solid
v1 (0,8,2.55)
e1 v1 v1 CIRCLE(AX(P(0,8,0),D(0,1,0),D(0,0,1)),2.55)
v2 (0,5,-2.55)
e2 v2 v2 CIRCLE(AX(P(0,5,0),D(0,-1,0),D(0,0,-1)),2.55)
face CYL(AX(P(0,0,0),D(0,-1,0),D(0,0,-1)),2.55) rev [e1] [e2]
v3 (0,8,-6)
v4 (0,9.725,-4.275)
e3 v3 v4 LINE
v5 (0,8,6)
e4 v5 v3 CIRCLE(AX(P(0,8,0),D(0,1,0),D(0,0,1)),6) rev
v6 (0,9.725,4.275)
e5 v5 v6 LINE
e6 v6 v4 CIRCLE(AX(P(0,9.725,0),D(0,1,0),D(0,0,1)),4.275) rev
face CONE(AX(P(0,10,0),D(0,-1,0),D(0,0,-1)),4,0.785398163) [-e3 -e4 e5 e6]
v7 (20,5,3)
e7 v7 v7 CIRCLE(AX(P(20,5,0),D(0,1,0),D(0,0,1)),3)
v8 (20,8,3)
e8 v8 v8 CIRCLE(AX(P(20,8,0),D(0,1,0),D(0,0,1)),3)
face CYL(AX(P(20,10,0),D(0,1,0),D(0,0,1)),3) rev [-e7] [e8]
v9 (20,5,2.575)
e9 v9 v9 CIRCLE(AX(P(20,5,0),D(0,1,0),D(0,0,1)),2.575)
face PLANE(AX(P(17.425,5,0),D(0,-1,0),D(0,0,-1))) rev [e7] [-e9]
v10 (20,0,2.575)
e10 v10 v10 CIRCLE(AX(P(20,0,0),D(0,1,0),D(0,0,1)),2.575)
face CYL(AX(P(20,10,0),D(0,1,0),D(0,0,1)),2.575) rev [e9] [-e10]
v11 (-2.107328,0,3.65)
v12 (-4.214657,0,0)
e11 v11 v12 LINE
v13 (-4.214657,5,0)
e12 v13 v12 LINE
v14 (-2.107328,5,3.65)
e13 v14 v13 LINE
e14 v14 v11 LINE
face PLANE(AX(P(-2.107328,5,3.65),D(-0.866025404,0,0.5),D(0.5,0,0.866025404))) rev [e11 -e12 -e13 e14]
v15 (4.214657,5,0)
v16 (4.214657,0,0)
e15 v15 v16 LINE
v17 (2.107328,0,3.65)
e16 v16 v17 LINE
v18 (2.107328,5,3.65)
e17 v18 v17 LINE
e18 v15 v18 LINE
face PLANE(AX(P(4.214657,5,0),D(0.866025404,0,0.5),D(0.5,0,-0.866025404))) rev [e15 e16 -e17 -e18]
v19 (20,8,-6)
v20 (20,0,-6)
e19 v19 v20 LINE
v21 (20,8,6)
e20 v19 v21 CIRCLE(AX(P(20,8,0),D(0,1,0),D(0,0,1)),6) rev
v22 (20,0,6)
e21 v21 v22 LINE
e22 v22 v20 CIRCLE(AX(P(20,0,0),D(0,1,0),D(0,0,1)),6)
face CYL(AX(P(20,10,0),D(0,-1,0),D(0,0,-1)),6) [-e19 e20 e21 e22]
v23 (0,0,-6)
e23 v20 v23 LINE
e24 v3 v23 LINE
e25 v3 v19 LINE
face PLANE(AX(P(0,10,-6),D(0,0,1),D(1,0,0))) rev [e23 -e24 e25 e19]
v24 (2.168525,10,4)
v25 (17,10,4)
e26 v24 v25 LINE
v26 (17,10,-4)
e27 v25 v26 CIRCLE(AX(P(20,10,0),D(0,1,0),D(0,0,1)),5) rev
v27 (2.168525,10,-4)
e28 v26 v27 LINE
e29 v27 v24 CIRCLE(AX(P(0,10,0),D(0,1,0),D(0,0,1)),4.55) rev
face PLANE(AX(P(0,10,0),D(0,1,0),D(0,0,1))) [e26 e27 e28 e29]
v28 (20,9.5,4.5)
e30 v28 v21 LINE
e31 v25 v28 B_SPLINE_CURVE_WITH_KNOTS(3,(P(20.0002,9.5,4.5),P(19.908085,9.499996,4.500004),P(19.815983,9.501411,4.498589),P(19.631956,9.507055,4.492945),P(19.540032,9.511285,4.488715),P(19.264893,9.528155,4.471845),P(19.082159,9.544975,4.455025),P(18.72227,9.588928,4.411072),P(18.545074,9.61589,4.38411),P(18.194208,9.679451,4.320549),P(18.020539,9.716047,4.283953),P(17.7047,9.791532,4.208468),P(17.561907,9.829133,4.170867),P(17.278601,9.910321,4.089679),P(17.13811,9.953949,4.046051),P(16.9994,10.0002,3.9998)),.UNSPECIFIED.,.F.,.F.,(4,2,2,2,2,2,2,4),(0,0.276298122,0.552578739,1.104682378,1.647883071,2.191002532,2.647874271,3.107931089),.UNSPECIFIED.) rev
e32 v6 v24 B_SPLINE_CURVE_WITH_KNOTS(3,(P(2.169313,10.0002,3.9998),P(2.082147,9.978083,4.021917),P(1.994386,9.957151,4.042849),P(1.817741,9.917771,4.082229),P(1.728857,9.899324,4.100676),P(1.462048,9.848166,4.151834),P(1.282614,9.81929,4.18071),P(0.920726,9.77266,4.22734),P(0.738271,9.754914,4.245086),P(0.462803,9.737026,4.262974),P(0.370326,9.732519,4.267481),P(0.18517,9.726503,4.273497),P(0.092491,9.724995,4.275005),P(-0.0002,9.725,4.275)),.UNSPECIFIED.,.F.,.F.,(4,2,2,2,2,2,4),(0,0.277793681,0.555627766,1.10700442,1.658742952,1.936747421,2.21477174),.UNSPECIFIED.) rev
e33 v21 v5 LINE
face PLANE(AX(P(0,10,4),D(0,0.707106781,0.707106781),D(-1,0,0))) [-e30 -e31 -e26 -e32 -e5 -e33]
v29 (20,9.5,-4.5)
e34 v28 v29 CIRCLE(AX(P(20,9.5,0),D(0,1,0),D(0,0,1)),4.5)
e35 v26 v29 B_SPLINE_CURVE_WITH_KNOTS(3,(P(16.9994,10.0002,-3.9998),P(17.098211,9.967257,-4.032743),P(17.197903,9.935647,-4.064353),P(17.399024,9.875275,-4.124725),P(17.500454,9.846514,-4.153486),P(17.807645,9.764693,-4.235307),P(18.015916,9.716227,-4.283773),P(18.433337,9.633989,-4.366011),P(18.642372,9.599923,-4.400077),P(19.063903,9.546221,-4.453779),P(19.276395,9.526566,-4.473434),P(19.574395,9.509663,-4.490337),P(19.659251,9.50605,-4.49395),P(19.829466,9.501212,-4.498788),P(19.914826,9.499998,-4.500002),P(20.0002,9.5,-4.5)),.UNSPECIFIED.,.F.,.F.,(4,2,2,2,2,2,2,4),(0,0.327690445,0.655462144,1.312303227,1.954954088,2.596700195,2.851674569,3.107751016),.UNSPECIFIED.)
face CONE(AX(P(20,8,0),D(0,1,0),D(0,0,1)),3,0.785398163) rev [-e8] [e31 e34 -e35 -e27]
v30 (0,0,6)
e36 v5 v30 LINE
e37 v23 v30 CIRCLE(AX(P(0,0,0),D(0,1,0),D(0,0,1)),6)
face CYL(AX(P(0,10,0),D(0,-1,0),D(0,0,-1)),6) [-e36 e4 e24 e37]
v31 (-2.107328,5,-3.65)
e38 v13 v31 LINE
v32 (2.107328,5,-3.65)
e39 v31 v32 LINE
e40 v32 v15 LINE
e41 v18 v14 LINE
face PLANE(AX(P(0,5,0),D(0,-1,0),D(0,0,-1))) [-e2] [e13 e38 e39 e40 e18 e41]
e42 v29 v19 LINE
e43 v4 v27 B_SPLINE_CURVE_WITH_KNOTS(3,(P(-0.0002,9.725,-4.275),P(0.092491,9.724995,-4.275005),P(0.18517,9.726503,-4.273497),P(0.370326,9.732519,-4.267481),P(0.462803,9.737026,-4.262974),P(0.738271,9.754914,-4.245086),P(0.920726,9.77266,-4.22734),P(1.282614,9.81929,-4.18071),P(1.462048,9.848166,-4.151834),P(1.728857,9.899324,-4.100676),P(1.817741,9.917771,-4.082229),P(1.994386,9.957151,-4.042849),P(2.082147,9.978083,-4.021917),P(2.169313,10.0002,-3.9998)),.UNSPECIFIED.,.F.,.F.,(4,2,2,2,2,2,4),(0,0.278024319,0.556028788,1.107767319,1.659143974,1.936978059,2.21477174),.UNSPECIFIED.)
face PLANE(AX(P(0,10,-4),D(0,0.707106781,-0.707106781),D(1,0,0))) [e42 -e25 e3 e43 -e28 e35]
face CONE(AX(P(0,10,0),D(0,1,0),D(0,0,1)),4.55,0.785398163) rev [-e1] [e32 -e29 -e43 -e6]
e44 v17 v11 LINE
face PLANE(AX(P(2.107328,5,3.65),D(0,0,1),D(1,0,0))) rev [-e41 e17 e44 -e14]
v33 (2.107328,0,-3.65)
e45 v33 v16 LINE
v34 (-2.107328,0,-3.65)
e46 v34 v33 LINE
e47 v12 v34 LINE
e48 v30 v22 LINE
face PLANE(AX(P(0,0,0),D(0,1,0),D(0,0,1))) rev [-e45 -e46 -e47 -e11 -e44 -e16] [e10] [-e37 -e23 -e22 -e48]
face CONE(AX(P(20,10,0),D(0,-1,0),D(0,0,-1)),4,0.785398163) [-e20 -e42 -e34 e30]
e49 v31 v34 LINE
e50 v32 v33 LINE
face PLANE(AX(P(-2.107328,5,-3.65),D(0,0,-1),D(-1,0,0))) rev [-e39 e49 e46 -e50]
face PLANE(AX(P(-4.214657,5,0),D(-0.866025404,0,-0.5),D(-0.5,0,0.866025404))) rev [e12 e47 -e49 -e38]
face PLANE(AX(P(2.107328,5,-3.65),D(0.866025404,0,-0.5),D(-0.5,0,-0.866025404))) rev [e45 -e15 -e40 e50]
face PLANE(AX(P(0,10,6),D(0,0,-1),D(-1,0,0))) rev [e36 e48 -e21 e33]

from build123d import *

# Parameters (mm, degrees)
EXTRUDE_1_DEPTH     = 10
CHAMFER_1_SIZE      = 2
CUT_EXTRUDE_1_DEPTH = 5


with BuildPart() as part:
    # 草图1 → 凸台-拉伸1 (new body)
    with BuildSketch(Plane(origin=(0, 0, 0), x_dir=(1, 0, 0), z_dir=(0, 1, 0))):
        with BuildLine():
            Line((0, 6), (20, 6))
            ThreePointArc((20, 6), (26, 0), (20, -6))
            Line((20, -6), (0, -6))
            ThreePointArc((0, -6), (-6, 0), (0, 6))
        make_face()
    extrude(amount=EXTRUDE_1_DEPTH)

    # 草图2 → 切除-旋转1 (revolve, cut)
    with BuildSketch(Plane.XY, mode=Mode.PRIVATE) as cut_revolve_1_sk:
        Polygon((-2.55, 10), (-2.55, 5), (-1.6, 5), (-1.6, 2), (-2.55, 2), (-2.55, 0), (0, 0), (0, 10), align=None)
    revolve(cut_revolve_1_sk.sketch.rotate(Axis((0, 0, 0), (0, 1, 0)), 270), axis=Axis((0, 0, 0), (0, 1, 0)), mode=Mode.SUBTRACT)

    # 草图3 → 切除-旋转2 (revolve, cut)
    with BuildSketch(Plane.XY, mode=Mode.PRIVATE) as cut_revolve_2_sk:
        Polygon((20, 0), (17.425, 0), (17.425, 5), (17, 5), (17, 10), (20, 10), align=None)
    revolve(cut_revolve_2_sk.sketch.rotate(Axis((20, 10, 0), (0, -1, 0)), 270), axis=Axis((20, 10, 0), (0, -1, 0)), mode=Mode.SUBTRACT)

    # 倒角1
    # the kernel refuses this chamfer: 2 mm, written as the material it takes off along each edge
    with BuildSketch(Plane(origin=(20, 10, 0), x_dir=(0, 0, -1), z_dir=(-1, 0, 0))) as chamfer_1_piece_1:
        Polygon((6, CHAMFER_1_SIZE), (6 - CHAMFER_1_SIZE, 0), (6, 0), align=None)
    revolve(axis=Axis((20, 10, 0), (0, -1, 0)), revolution_arc=180, mode=Mode.SUBTRACT)
    with BuildSketch(Plane(origin=(0, 10, 0), x_dir=(0, 0, -1), z_dir=(1, 0, 0))) as chamfer_1_piece_2:
        Polygon((2.55 + CHAMFER_1_SIZE, 0), (2.55, -CHAMFER_1_SIZE), (2.55, 0), align=None)
    revolve(axis=Axis((0, 10, 0), (0, 1, 0)), mode=Mode.SUBTRACT)
    with BuildSketch(Plane(origin=(0, 10, -6), x_dir=(0, -0.9996219169112968, -0.027495876610586487), z_dir=(1, 0, 0)), Plane(origin=(20, 10, 6), x_dir=(0, -0.9996219169112968, 0.027495876610586487), z_dir=(-1, 0, 0))) as chamfer_1_piece_3:
        Polygon((CHAMFER_1_SIZE * 0.999621916911, -CHAMFER_1_SIZE * 0.0274958766106), (-CHAMFER_1_SIZE * 0.0274958766106, -CHAMFER_1_SIZE * 0.999621916911), (0, 0), align=None)
    extrude(amount=20, mode=Mode.SUBTRACT)
    with BuildSketch(Plane(origin=(20, 10, 0), x_dir=(0, 0, 1), z_dir=(1, 0, 0))) as chamfer_1_piece_4:
        Polygon((3 + CHAMFER_1_SIZE, 0), (3, CHAMFER_1_SIZE), (3, 0), align=None)
    revolve(axis=Axis((20, 10, 0), (0, -1, 0)), mode=Mode.SUBTRACT)
    with BuildSketch(Plane(origin=(0, 10, 0), x_dir=(0, 0, 1), z_dir=(1, 0, 0))) as chamfer_1_piece_5:
        Polygon((6 - CHAMFER_1_SIZE, 0), (6, CHAMFER_1_SIZE), (6, 0), align=None)
    revolve(axis=Axis((0, 10, 0), (0, -1, 0)), revolution_arc=180, mode=Mode.SUBTRACT)

    # 草图4 → 切除-拉伸1 (cut)
    with BuildSketch(Plane.XZ):
        Polygon((-2.107328483, -3.65), (2.107328483, -3.65), (4.214656965, 0), (2.107328483, 3.65), (-2.107328483, 3.65), (-4.214656965, 0), align=None)
    extrude(amount=-CUT_EXTRUDE_1_DEPTH, mode=Mode.SUBTRACT)


solid = part.part
